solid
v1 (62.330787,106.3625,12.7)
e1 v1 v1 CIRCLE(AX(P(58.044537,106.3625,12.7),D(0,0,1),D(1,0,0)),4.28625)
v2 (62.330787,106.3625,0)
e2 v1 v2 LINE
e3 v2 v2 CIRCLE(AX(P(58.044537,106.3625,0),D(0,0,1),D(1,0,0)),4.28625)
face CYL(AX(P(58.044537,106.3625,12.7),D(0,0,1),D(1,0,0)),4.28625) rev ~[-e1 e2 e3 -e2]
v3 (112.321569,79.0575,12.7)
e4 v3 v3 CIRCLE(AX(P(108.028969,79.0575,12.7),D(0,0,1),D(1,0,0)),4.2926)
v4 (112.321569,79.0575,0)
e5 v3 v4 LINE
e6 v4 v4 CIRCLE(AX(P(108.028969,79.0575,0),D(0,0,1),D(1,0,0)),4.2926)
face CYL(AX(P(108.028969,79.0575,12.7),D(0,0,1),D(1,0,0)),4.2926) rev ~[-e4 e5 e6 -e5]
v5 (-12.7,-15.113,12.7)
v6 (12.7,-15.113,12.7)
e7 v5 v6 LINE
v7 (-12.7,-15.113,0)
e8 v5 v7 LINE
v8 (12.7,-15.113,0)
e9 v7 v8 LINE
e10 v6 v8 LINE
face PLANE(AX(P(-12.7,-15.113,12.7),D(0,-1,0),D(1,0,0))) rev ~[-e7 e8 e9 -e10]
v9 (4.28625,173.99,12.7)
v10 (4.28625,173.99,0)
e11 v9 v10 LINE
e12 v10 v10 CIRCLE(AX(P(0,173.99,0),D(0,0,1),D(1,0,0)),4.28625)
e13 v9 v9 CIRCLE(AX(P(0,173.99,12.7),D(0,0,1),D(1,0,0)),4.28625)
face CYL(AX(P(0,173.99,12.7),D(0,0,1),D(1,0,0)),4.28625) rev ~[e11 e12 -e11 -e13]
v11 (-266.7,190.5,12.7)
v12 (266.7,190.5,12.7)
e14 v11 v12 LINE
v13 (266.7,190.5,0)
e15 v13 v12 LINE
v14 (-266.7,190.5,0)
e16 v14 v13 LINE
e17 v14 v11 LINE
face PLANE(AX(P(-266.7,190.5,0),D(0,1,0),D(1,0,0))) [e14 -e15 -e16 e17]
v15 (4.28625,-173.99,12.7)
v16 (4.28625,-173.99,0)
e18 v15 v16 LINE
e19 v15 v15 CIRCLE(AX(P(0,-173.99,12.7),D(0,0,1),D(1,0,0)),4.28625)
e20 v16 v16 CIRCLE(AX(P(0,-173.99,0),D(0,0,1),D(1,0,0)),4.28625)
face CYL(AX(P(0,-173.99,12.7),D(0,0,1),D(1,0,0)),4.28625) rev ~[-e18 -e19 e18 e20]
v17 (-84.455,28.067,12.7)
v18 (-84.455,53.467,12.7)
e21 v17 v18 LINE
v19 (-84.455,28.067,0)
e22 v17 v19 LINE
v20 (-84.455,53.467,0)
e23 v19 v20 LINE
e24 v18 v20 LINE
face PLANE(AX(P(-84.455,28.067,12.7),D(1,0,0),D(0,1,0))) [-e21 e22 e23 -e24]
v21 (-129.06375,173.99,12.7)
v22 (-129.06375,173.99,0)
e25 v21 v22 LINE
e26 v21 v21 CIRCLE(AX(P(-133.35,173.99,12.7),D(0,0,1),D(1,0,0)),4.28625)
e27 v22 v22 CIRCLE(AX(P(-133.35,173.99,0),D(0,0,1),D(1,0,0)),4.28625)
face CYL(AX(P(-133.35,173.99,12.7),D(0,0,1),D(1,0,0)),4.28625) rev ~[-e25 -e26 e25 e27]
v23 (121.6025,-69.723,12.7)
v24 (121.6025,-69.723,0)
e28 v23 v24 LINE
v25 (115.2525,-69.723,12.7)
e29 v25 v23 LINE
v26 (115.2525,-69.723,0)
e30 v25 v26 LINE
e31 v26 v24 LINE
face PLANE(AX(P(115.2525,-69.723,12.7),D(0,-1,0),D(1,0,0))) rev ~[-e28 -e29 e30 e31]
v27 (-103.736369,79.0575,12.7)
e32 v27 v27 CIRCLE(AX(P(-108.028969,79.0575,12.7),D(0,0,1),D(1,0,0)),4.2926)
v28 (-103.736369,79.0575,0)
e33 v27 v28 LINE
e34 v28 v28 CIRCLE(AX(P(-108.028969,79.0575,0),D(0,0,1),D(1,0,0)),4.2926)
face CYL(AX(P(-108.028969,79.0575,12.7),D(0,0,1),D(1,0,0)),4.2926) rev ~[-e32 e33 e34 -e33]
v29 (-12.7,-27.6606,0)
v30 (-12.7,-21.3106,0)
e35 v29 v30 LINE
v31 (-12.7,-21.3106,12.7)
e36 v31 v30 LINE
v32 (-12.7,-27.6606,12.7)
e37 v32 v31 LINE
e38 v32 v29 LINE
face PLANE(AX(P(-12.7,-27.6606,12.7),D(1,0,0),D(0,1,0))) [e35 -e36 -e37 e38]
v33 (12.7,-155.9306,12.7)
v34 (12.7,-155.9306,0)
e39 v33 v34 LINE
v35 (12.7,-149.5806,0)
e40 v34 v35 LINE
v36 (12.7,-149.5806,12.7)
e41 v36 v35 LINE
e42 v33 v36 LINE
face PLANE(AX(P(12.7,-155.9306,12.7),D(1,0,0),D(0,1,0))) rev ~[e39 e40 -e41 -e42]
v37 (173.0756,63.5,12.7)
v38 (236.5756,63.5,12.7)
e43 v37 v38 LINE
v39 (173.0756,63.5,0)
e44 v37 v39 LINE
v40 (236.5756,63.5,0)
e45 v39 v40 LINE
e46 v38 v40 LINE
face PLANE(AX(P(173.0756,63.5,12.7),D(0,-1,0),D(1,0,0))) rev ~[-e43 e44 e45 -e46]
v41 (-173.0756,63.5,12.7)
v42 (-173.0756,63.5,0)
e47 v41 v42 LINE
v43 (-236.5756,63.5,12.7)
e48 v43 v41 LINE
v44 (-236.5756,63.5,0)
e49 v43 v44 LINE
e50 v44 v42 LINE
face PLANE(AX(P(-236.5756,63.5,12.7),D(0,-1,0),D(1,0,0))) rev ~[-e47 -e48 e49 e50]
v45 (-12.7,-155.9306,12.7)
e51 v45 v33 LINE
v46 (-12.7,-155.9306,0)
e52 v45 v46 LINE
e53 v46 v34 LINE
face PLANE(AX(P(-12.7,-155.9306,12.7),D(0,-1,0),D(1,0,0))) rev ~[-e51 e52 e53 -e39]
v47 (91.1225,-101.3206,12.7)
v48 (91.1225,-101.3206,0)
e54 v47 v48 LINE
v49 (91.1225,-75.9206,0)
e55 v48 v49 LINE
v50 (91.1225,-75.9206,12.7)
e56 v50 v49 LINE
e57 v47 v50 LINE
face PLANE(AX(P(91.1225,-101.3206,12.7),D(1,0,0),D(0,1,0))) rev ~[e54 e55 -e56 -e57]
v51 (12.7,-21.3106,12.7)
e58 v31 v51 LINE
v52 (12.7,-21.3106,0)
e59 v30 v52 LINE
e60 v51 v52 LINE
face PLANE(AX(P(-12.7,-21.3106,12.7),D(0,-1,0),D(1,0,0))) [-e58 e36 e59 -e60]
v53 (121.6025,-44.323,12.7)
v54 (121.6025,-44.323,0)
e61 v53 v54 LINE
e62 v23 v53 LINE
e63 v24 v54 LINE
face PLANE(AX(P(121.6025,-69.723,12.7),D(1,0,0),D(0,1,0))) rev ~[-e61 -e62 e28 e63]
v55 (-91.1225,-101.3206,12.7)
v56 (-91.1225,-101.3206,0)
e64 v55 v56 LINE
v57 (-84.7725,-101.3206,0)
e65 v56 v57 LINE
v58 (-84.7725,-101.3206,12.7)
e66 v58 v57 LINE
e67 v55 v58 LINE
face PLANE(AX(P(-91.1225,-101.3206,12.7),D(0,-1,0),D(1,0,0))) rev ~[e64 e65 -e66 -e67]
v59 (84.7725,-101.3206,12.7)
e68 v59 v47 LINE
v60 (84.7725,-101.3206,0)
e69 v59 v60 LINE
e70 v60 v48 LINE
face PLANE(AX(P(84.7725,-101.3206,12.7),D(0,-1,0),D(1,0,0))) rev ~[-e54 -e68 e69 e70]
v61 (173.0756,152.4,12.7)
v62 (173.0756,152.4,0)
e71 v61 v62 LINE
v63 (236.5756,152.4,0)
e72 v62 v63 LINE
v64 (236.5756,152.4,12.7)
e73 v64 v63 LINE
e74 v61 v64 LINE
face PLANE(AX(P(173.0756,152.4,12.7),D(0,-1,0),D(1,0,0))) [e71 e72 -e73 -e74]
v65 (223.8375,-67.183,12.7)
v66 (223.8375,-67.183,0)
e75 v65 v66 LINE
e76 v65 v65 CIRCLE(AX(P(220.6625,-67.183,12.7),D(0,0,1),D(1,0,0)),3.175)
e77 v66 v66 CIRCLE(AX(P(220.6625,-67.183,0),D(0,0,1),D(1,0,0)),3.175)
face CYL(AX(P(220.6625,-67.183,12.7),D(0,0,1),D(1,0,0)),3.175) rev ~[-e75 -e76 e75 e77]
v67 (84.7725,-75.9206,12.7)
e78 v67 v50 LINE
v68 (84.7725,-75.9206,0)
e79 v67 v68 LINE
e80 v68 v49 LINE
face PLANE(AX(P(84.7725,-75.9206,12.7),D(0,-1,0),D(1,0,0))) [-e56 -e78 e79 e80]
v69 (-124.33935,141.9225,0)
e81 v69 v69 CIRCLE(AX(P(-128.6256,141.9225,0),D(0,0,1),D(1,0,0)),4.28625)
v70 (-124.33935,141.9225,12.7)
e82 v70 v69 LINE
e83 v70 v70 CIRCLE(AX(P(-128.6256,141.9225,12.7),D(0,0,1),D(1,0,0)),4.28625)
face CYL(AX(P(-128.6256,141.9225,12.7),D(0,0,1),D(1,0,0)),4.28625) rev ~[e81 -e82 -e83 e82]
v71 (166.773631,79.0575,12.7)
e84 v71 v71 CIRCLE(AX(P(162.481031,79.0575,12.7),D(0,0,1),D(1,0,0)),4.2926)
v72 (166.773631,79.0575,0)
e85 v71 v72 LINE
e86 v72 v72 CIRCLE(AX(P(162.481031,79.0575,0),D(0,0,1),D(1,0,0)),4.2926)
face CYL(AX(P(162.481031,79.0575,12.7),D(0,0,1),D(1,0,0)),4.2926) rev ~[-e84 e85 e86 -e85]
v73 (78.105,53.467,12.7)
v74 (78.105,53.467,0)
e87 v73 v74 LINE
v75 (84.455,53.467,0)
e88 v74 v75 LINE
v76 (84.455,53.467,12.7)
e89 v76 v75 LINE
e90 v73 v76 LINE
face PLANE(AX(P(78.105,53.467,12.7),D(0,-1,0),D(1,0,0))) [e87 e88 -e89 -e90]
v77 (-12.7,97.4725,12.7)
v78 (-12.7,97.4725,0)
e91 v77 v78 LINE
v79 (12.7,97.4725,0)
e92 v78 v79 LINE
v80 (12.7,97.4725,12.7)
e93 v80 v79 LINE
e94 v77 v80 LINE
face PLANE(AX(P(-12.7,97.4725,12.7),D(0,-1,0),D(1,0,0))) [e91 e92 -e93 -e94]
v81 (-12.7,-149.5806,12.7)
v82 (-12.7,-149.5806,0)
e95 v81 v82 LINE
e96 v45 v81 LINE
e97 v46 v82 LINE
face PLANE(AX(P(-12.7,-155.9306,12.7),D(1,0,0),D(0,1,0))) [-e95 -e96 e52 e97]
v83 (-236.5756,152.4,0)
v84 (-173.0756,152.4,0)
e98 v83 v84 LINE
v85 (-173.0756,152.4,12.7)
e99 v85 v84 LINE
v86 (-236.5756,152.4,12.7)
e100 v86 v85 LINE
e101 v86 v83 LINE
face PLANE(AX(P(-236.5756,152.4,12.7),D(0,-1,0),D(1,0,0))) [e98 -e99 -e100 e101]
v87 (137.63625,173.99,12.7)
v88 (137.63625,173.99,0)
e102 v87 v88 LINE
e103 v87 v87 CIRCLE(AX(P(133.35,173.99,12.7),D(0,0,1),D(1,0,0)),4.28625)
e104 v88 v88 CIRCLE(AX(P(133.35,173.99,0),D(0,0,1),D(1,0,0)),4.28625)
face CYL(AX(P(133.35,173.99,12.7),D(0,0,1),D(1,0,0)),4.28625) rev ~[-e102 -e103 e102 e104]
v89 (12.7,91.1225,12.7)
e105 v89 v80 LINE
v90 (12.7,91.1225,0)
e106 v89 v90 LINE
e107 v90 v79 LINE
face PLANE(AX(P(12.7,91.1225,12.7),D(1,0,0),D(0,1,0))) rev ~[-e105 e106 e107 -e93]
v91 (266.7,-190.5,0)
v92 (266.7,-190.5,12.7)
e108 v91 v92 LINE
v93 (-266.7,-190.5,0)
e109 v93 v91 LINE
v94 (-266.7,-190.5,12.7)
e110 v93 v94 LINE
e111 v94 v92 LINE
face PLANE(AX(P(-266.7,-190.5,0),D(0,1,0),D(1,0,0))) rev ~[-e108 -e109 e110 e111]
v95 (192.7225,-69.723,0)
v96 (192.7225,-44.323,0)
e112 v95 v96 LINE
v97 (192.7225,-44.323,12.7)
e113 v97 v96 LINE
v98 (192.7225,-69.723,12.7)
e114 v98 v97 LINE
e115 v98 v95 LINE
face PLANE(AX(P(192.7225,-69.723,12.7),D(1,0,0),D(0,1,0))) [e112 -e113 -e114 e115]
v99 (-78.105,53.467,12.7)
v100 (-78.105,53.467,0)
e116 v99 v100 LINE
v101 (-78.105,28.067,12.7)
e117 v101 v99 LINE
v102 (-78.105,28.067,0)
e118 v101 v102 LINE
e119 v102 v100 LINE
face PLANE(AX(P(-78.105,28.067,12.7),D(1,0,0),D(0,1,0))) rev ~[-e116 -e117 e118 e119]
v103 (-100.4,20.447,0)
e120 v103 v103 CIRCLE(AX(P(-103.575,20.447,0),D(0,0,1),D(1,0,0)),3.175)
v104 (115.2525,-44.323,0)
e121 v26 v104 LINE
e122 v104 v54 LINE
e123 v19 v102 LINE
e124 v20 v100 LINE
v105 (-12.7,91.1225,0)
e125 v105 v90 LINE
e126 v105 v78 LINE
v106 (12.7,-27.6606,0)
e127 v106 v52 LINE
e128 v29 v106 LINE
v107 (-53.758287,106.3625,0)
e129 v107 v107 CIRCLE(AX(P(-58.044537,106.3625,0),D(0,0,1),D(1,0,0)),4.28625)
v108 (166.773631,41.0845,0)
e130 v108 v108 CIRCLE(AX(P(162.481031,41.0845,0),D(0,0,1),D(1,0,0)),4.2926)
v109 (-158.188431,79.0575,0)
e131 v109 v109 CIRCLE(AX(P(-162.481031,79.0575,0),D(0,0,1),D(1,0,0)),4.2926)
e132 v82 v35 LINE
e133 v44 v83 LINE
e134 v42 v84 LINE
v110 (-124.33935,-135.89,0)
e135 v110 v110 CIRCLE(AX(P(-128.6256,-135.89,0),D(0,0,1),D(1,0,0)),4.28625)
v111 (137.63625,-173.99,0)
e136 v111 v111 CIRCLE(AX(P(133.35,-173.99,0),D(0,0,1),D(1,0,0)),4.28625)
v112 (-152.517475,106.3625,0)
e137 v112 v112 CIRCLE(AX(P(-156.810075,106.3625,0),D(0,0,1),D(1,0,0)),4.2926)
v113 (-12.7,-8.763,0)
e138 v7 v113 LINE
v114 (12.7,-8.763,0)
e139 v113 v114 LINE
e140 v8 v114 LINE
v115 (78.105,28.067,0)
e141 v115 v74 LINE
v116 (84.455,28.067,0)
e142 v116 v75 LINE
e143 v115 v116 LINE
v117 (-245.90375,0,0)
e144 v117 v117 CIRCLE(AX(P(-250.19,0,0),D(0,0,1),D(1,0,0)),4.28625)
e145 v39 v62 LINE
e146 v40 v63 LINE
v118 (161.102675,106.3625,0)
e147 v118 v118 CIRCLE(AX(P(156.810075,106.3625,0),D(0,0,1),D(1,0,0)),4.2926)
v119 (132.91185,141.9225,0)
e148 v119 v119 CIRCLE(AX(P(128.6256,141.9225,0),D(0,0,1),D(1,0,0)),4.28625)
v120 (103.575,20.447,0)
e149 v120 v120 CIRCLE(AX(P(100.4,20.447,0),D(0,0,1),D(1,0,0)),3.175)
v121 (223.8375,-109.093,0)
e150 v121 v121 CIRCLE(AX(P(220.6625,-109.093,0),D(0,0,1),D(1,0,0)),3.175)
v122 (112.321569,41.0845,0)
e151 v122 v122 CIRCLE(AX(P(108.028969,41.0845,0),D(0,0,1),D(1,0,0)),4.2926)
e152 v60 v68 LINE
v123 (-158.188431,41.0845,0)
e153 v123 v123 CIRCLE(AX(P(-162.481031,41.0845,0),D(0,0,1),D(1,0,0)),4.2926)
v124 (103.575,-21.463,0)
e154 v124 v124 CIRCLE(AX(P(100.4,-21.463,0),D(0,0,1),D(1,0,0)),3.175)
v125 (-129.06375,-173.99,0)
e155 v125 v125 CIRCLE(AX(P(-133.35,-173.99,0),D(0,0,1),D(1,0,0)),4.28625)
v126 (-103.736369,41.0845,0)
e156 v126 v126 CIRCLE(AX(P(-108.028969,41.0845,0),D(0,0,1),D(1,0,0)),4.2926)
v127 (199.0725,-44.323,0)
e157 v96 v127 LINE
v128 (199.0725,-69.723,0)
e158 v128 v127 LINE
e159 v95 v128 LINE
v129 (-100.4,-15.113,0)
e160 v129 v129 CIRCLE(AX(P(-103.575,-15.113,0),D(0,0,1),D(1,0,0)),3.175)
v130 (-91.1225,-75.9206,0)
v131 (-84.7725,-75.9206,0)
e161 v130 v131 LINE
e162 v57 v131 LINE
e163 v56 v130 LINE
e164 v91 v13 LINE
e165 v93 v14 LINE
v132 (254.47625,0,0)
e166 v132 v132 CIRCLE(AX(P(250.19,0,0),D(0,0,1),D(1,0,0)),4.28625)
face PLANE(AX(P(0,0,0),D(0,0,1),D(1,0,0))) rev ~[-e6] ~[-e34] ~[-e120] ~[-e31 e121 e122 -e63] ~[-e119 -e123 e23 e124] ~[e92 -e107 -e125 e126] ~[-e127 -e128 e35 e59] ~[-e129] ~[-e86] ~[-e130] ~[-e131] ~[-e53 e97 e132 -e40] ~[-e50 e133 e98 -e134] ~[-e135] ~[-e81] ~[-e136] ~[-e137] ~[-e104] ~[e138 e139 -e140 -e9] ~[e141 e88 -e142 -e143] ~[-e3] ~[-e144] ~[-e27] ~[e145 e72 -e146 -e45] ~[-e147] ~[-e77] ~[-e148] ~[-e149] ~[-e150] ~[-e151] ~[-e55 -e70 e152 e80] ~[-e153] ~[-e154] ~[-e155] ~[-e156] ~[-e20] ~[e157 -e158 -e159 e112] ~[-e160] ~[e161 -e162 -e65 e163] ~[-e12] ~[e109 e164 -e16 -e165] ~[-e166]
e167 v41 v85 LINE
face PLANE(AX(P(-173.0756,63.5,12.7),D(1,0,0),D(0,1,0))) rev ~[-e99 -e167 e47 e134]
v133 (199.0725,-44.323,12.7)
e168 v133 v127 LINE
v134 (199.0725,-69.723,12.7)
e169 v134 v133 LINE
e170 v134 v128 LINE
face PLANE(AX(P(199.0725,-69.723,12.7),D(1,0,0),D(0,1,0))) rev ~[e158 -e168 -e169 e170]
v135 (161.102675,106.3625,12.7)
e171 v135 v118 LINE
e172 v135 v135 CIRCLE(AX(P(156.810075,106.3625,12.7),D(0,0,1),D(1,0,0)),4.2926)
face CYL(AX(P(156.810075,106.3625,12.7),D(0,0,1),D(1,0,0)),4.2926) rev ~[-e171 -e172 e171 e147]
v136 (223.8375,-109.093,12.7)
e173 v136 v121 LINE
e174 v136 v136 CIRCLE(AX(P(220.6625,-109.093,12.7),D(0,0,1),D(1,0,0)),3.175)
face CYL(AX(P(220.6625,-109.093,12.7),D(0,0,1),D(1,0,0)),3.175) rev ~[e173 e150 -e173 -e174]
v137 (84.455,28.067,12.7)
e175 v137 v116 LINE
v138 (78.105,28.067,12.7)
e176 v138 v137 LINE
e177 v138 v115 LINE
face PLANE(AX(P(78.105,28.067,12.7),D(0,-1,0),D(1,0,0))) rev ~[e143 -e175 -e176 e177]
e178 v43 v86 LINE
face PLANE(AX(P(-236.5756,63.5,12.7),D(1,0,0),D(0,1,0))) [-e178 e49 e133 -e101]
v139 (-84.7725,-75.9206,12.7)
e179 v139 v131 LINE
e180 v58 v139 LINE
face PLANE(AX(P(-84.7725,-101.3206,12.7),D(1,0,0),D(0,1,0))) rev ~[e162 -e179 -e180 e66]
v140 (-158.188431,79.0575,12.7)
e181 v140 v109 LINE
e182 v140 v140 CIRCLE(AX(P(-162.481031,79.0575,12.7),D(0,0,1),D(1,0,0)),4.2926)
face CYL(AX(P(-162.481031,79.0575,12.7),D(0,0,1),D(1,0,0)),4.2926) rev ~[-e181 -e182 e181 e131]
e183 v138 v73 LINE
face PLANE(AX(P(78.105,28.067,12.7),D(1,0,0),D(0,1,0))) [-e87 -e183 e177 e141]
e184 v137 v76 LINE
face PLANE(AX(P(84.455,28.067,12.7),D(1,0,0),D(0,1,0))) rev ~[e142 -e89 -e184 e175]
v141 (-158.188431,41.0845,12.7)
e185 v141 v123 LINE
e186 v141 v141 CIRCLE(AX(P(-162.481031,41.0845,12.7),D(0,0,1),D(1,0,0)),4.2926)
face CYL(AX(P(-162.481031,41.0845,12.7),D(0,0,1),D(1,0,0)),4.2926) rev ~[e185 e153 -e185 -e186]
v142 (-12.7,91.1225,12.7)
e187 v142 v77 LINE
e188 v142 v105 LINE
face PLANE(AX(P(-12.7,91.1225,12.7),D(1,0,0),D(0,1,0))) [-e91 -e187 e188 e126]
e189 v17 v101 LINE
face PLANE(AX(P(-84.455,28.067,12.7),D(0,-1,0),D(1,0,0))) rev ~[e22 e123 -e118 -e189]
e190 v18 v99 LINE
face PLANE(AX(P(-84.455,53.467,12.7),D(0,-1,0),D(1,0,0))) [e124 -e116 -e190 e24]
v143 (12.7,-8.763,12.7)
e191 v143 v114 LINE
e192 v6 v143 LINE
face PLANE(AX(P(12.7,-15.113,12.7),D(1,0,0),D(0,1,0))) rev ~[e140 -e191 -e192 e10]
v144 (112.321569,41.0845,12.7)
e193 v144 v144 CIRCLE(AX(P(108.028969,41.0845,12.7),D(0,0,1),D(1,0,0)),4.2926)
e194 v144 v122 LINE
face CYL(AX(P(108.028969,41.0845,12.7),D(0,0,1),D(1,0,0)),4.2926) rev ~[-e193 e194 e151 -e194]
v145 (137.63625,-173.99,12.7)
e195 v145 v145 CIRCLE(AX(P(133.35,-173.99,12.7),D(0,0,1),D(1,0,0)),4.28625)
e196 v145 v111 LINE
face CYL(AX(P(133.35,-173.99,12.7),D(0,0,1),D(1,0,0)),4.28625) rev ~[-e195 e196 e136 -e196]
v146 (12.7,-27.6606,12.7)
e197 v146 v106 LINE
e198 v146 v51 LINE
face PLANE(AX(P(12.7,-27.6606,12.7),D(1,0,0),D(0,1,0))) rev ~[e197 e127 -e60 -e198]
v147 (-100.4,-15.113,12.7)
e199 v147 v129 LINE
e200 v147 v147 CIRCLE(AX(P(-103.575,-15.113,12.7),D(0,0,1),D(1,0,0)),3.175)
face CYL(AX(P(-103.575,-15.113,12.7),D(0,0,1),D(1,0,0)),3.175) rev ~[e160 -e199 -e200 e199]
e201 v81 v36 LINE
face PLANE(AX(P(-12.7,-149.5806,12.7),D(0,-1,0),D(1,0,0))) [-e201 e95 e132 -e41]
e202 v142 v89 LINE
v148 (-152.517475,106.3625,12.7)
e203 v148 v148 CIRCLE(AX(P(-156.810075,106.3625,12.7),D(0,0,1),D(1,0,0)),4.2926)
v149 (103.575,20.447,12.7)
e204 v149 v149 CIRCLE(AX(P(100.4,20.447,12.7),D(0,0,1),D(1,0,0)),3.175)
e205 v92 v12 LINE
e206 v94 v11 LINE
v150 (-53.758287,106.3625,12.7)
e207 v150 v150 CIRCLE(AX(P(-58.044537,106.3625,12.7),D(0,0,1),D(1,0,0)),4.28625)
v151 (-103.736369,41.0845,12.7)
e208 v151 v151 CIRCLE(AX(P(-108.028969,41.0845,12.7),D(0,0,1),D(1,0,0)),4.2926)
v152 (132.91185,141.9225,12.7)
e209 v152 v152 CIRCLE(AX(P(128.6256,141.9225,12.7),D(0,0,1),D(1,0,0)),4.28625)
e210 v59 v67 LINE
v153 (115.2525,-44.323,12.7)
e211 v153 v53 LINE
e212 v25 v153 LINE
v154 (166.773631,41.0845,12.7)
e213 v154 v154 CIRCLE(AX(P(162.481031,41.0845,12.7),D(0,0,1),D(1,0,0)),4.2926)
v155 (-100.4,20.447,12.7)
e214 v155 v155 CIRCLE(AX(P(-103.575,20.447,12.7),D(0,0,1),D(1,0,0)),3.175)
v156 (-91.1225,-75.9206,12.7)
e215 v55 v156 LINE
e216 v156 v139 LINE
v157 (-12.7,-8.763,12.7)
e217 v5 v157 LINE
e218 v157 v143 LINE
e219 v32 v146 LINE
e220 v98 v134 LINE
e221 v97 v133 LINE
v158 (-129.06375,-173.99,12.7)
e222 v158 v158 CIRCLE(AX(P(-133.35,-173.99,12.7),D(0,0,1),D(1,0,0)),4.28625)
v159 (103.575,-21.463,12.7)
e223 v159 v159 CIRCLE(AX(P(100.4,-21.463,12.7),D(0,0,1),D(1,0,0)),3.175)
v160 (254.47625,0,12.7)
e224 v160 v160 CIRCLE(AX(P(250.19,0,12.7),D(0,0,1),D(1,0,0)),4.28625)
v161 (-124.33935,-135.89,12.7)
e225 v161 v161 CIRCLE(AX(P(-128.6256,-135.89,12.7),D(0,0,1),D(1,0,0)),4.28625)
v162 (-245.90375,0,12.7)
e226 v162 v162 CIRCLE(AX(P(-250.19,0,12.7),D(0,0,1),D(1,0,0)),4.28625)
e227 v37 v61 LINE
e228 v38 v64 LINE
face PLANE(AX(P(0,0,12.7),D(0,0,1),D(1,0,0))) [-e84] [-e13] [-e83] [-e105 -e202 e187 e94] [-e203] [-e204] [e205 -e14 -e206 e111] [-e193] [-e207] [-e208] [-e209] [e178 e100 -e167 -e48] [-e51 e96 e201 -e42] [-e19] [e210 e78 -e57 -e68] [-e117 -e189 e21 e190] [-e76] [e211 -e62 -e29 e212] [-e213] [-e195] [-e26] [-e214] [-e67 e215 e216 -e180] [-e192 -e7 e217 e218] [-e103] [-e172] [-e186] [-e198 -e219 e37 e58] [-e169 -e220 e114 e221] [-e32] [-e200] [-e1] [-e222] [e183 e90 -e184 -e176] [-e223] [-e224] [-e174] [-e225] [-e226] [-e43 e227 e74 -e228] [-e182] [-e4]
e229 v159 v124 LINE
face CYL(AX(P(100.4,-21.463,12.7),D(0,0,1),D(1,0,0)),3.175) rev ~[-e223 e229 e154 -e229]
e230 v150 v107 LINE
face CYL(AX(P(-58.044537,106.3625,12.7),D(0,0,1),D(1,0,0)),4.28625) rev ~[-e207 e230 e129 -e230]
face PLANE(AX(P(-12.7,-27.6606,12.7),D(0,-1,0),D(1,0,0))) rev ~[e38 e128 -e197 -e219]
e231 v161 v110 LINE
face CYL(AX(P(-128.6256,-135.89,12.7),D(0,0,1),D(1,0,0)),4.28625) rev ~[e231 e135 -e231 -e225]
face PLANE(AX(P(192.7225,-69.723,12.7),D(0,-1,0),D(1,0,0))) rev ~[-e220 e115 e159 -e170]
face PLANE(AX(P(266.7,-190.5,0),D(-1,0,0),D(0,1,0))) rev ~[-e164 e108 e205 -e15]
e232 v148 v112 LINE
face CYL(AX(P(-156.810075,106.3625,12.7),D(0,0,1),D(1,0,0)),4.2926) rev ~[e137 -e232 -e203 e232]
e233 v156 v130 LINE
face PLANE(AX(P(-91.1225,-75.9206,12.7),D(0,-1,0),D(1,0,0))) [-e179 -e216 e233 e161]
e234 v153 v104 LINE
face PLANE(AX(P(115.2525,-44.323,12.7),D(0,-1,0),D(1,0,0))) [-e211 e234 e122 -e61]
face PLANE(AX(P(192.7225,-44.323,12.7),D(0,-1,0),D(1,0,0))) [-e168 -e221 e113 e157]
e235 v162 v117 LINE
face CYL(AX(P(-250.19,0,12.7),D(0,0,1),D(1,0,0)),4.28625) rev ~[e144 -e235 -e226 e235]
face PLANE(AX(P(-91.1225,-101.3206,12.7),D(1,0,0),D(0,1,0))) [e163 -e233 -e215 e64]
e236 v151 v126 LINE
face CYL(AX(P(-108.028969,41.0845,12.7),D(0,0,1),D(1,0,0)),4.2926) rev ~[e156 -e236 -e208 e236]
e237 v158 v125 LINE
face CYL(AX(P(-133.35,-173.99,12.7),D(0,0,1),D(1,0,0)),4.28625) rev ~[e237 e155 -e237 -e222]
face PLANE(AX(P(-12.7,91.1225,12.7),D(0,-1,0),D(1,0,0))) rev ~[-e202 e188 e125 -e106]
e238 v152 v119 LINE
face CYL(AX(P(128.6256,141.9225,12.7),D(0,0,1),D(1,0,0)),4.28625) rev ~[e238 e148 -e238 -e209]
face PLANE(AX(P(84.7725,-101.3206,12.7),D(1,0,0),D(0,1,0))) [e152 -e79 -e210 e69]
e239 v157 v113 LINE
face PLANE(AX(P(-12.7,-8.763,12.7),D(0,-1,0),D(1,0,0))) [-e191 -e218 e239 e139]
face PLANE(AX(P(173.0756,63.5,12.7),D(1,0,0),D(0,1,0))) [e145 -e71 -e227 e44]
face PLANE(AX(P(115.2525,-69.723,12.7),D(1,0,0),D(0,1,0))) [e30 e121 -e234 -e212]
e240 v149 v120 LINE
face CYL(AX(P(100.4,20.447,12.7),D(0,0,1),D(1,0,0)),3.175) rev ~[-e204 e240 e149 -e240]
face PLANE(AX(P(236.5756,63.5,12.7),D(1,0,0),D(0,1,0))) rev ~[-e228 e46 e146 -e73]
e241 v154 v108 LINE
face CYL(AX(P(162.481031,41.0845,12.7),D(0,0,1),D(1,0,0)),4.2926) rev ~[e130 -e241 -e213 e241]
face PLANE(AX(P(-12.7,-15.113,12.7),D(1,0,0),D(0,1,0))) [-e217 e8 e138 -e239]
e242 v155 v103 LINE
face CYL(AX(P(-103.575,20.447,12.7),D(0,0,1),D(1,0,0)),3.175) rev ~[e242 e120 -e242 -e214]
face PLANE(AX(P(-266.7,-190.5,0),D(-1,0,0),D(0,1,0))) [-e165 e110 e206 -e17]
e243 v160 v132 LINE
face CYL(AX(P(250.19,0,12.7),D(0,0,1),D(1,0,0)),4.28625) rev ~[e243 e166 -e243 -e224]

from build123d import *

# Parameters (mm, degrees)
F0_W     = 533.4
F0_H     = 381
F1_DEPTH = 12.7
F5_W     = 25.4
F5_H     = 6.35
F5_W_2   = 6.35
F5_H_2   = 25.4
F5_R     = 3.175
F5_R_2   = 4.28625
F5_R_3   = 4.2926
F5_W_3   = 63.5
F5_H_3   = 88.9
F4_R     = 4.28625
F4_W     = 25.4
F4_H     = 6.35
F4_R_2   = 4.2926
F4_W_2   = 6.35
F4_H_2   = 25.4
F4_W_3   = 63.5
F4_H_3   = 88.9
F6_DEPTH = 12.701


# Not quite as in the source:
# - a feature of the source that left no trace in its solid (it failed there, or was rolled back) is left out


with BuildPart() as f1:
    # F0 (on Top) → F1 (new body)
    with BuildSketch(Plane.XY):
        Rectangle(F0_W, F0_H)
    extrude(amount=F1_DEPTH)

    # F5 (on face) + F4 (on face) → F6 (cut, through all)
    with BuildSketch(Plane.XY.offset(12.7)):
        with Locations((0, -24.4856)):
            Rectangle(F5_W, F5_H)
        with Locations((87.9475, -88.6206)):
            Rectangle(F5_W_2, F5_H_2)
        with Locations((0, -152.7556)):
            Rectangle(F5_W, F5_H)
        with Locations((-87.9475, -88.6206)):
            Rectangle(F5_W_2, F5_H_2)
        with Locations((-103.575, 20.447)):
            Circle(F5_R)
        with Locations((-103.575, -15.113)):
            Circle(F5_R)
        with Locations((220.6625, -67.183)):
            Circle(F5_R)
        with Locations((220.6625, -109.093)):
            Circle(F5_R)
        with Locations((100.4, 20.447)):
            Circle(F5_R)
        with Locations((100.4, -21.463)):
            Circle(F5_R)
        with Locations((118.4275, -57.023)):
            Rectangle(F5_W_2, F5_H_2)
        with Locations((195.8975, -57.023)):
            Rectangle(F5_W_2, F5_H_2)
        with Locations((-128.6256, -135.89)):
            Circle(F5_R_2)
        with Locations((0, -11.938)):
            Rectangle(F5_W, F5_H)
        with Locations((-162.4810314, 41.0845)):
            Circle(F5_R_3)
        with Locations((-162.4810314, 79.0575)):
            Circle(F5_R_3)
        with Locations((-108.0289686, 41.0845)):
            Circle(F5_R_3)
        with Locations((-81.28, 40.767)):
            Rectangle(F5_W_2, F5_H_2)
        with Locations((-108.0289686, 79.0575)):
            Circle(F5_R_3)
        with Locations((-204.8256, 107.95)):
            Rectangle(F5_W_3, F5_H_3)
        with Locations((-156.810075, 106.3625)):
            Circle(F5_R_3)
        with Locations((-128.6256, 141.9225)):
            Circle(F5_R_2)
        with Locations((-58.0445372, 106.3625)):
            Circle(F5_R_2)
        with Locations((81.28, 40.767)):
            Rectangle(F5_W_2, F5_H_2)
        with Locations((108.0289686, 41.0845)):
            Circle(F5_R_3)
        with Locations((0, 94.2975)):
            Rectangle(F5_W, F5_H)
        with Locations((108.0289686, 79.0575)):
            Circle(F5_R_3)
        with Locations((162.4810314, 41.0845)):
            Circle(F5_R_3)
        with Locations((162.4810314, 79.0575)):
            Circle(F5_R_3)
        with Locations((58.0445372, 106.3625)):
            Circle(F5_R_2)
        with Locations((128.6256, 141.9225)):
            Circle(F5_R_2)
        with Locations((156.810075, 106.3625)):
            Circle(F5_R_3)
        with Locations((204.8256, 107.95)):
            Rectangle(F5_W_3, F5_H_3)
    with BuildSketch(Plane.XY.offset(12.7)):
        with Locations((-133.35, 173.99)):
            Circle(F4_R)
        with Locations((0, 173.99)):
            Circle(F4_R)
        with Locations((133.35, 173.99)):
            Circle(F4_R)
        with Locations((250.19, 0)):
            Circle(F4_R)
        with Locations((-250.19, 0)):
            Circle(F4_R)
        with Locations((0, -173.99)):
            Circle(F4_R)
        with Locations((133.35, -173.99)):
            Circle(F4_R)
        with Locations((-133.35, -173.99)):
            Circle(F4_R)
        with Locations((-128.6256, -135.89)):
            Circle(F4_R)
        with Locations((0, -11.938)):
            Rectangle(F4_W, F4_H)
        with Locations((-162.4810314, 41.0845)):
            Circle(F4_R_2)
        with Locations((-162.4810314, 79.0575)):
            Circle(F4_R_2)
        with Locations((-108.0289686, 41.0845)):
            Circle(F4_R_2)
        with Locations((-81.28, 40.767)):
            Rectangle(F4_W_2, F4_H_2)
        with Locations((-108.0289686, 79.0575)):
            Circle(F4_R_2)
        with Locations((-204.8256, 107.95)):
            Rectangle(F4_W_3, F4_H_3)
        with Locations((-156.810075, 106.3625)):
            Circle(F4_R_2)
        with Locations((-128.6256, 141.9225)):
            Circle(F4_R)
        with Locations((-58.0445372, 106.3625)):
            Circle(F4_R)
        with Locations((81.28, 40.767)):
            Rectangle(F4_W_2, F4_H_2)
        with Locations((108.0289686, 41.0845)):
            Circle(F4_R_2)
        with Locations((0, 94.2975)):
            Rectangle(F4_W, F4_H)
        with Locations((108.0289686, 79.0575)):
            Circle(F4_R_2)
        with Locations((162.4810314, 41.0845)):
            Circle(F4_R_2)
        with Locations((162.4810314, 79.0575)):
            Circle(F4_R_2)
        with Locations((58.0445372, 106.3625)):
            Circle(F4_R)
        with Locations((128.6256, 141.9225)):
            Circle(F4_R)
        with Locations((156.810075, 106.3625)):
            Circle(F4_R_2)
        with Locations((204.8256, 107.95)):
            Rectangle(F4_W_3, F4_H_3)
    extrude(amount=-F6_DEPTH, mode=Mode.SUBTRACT)


solid = f1.part
